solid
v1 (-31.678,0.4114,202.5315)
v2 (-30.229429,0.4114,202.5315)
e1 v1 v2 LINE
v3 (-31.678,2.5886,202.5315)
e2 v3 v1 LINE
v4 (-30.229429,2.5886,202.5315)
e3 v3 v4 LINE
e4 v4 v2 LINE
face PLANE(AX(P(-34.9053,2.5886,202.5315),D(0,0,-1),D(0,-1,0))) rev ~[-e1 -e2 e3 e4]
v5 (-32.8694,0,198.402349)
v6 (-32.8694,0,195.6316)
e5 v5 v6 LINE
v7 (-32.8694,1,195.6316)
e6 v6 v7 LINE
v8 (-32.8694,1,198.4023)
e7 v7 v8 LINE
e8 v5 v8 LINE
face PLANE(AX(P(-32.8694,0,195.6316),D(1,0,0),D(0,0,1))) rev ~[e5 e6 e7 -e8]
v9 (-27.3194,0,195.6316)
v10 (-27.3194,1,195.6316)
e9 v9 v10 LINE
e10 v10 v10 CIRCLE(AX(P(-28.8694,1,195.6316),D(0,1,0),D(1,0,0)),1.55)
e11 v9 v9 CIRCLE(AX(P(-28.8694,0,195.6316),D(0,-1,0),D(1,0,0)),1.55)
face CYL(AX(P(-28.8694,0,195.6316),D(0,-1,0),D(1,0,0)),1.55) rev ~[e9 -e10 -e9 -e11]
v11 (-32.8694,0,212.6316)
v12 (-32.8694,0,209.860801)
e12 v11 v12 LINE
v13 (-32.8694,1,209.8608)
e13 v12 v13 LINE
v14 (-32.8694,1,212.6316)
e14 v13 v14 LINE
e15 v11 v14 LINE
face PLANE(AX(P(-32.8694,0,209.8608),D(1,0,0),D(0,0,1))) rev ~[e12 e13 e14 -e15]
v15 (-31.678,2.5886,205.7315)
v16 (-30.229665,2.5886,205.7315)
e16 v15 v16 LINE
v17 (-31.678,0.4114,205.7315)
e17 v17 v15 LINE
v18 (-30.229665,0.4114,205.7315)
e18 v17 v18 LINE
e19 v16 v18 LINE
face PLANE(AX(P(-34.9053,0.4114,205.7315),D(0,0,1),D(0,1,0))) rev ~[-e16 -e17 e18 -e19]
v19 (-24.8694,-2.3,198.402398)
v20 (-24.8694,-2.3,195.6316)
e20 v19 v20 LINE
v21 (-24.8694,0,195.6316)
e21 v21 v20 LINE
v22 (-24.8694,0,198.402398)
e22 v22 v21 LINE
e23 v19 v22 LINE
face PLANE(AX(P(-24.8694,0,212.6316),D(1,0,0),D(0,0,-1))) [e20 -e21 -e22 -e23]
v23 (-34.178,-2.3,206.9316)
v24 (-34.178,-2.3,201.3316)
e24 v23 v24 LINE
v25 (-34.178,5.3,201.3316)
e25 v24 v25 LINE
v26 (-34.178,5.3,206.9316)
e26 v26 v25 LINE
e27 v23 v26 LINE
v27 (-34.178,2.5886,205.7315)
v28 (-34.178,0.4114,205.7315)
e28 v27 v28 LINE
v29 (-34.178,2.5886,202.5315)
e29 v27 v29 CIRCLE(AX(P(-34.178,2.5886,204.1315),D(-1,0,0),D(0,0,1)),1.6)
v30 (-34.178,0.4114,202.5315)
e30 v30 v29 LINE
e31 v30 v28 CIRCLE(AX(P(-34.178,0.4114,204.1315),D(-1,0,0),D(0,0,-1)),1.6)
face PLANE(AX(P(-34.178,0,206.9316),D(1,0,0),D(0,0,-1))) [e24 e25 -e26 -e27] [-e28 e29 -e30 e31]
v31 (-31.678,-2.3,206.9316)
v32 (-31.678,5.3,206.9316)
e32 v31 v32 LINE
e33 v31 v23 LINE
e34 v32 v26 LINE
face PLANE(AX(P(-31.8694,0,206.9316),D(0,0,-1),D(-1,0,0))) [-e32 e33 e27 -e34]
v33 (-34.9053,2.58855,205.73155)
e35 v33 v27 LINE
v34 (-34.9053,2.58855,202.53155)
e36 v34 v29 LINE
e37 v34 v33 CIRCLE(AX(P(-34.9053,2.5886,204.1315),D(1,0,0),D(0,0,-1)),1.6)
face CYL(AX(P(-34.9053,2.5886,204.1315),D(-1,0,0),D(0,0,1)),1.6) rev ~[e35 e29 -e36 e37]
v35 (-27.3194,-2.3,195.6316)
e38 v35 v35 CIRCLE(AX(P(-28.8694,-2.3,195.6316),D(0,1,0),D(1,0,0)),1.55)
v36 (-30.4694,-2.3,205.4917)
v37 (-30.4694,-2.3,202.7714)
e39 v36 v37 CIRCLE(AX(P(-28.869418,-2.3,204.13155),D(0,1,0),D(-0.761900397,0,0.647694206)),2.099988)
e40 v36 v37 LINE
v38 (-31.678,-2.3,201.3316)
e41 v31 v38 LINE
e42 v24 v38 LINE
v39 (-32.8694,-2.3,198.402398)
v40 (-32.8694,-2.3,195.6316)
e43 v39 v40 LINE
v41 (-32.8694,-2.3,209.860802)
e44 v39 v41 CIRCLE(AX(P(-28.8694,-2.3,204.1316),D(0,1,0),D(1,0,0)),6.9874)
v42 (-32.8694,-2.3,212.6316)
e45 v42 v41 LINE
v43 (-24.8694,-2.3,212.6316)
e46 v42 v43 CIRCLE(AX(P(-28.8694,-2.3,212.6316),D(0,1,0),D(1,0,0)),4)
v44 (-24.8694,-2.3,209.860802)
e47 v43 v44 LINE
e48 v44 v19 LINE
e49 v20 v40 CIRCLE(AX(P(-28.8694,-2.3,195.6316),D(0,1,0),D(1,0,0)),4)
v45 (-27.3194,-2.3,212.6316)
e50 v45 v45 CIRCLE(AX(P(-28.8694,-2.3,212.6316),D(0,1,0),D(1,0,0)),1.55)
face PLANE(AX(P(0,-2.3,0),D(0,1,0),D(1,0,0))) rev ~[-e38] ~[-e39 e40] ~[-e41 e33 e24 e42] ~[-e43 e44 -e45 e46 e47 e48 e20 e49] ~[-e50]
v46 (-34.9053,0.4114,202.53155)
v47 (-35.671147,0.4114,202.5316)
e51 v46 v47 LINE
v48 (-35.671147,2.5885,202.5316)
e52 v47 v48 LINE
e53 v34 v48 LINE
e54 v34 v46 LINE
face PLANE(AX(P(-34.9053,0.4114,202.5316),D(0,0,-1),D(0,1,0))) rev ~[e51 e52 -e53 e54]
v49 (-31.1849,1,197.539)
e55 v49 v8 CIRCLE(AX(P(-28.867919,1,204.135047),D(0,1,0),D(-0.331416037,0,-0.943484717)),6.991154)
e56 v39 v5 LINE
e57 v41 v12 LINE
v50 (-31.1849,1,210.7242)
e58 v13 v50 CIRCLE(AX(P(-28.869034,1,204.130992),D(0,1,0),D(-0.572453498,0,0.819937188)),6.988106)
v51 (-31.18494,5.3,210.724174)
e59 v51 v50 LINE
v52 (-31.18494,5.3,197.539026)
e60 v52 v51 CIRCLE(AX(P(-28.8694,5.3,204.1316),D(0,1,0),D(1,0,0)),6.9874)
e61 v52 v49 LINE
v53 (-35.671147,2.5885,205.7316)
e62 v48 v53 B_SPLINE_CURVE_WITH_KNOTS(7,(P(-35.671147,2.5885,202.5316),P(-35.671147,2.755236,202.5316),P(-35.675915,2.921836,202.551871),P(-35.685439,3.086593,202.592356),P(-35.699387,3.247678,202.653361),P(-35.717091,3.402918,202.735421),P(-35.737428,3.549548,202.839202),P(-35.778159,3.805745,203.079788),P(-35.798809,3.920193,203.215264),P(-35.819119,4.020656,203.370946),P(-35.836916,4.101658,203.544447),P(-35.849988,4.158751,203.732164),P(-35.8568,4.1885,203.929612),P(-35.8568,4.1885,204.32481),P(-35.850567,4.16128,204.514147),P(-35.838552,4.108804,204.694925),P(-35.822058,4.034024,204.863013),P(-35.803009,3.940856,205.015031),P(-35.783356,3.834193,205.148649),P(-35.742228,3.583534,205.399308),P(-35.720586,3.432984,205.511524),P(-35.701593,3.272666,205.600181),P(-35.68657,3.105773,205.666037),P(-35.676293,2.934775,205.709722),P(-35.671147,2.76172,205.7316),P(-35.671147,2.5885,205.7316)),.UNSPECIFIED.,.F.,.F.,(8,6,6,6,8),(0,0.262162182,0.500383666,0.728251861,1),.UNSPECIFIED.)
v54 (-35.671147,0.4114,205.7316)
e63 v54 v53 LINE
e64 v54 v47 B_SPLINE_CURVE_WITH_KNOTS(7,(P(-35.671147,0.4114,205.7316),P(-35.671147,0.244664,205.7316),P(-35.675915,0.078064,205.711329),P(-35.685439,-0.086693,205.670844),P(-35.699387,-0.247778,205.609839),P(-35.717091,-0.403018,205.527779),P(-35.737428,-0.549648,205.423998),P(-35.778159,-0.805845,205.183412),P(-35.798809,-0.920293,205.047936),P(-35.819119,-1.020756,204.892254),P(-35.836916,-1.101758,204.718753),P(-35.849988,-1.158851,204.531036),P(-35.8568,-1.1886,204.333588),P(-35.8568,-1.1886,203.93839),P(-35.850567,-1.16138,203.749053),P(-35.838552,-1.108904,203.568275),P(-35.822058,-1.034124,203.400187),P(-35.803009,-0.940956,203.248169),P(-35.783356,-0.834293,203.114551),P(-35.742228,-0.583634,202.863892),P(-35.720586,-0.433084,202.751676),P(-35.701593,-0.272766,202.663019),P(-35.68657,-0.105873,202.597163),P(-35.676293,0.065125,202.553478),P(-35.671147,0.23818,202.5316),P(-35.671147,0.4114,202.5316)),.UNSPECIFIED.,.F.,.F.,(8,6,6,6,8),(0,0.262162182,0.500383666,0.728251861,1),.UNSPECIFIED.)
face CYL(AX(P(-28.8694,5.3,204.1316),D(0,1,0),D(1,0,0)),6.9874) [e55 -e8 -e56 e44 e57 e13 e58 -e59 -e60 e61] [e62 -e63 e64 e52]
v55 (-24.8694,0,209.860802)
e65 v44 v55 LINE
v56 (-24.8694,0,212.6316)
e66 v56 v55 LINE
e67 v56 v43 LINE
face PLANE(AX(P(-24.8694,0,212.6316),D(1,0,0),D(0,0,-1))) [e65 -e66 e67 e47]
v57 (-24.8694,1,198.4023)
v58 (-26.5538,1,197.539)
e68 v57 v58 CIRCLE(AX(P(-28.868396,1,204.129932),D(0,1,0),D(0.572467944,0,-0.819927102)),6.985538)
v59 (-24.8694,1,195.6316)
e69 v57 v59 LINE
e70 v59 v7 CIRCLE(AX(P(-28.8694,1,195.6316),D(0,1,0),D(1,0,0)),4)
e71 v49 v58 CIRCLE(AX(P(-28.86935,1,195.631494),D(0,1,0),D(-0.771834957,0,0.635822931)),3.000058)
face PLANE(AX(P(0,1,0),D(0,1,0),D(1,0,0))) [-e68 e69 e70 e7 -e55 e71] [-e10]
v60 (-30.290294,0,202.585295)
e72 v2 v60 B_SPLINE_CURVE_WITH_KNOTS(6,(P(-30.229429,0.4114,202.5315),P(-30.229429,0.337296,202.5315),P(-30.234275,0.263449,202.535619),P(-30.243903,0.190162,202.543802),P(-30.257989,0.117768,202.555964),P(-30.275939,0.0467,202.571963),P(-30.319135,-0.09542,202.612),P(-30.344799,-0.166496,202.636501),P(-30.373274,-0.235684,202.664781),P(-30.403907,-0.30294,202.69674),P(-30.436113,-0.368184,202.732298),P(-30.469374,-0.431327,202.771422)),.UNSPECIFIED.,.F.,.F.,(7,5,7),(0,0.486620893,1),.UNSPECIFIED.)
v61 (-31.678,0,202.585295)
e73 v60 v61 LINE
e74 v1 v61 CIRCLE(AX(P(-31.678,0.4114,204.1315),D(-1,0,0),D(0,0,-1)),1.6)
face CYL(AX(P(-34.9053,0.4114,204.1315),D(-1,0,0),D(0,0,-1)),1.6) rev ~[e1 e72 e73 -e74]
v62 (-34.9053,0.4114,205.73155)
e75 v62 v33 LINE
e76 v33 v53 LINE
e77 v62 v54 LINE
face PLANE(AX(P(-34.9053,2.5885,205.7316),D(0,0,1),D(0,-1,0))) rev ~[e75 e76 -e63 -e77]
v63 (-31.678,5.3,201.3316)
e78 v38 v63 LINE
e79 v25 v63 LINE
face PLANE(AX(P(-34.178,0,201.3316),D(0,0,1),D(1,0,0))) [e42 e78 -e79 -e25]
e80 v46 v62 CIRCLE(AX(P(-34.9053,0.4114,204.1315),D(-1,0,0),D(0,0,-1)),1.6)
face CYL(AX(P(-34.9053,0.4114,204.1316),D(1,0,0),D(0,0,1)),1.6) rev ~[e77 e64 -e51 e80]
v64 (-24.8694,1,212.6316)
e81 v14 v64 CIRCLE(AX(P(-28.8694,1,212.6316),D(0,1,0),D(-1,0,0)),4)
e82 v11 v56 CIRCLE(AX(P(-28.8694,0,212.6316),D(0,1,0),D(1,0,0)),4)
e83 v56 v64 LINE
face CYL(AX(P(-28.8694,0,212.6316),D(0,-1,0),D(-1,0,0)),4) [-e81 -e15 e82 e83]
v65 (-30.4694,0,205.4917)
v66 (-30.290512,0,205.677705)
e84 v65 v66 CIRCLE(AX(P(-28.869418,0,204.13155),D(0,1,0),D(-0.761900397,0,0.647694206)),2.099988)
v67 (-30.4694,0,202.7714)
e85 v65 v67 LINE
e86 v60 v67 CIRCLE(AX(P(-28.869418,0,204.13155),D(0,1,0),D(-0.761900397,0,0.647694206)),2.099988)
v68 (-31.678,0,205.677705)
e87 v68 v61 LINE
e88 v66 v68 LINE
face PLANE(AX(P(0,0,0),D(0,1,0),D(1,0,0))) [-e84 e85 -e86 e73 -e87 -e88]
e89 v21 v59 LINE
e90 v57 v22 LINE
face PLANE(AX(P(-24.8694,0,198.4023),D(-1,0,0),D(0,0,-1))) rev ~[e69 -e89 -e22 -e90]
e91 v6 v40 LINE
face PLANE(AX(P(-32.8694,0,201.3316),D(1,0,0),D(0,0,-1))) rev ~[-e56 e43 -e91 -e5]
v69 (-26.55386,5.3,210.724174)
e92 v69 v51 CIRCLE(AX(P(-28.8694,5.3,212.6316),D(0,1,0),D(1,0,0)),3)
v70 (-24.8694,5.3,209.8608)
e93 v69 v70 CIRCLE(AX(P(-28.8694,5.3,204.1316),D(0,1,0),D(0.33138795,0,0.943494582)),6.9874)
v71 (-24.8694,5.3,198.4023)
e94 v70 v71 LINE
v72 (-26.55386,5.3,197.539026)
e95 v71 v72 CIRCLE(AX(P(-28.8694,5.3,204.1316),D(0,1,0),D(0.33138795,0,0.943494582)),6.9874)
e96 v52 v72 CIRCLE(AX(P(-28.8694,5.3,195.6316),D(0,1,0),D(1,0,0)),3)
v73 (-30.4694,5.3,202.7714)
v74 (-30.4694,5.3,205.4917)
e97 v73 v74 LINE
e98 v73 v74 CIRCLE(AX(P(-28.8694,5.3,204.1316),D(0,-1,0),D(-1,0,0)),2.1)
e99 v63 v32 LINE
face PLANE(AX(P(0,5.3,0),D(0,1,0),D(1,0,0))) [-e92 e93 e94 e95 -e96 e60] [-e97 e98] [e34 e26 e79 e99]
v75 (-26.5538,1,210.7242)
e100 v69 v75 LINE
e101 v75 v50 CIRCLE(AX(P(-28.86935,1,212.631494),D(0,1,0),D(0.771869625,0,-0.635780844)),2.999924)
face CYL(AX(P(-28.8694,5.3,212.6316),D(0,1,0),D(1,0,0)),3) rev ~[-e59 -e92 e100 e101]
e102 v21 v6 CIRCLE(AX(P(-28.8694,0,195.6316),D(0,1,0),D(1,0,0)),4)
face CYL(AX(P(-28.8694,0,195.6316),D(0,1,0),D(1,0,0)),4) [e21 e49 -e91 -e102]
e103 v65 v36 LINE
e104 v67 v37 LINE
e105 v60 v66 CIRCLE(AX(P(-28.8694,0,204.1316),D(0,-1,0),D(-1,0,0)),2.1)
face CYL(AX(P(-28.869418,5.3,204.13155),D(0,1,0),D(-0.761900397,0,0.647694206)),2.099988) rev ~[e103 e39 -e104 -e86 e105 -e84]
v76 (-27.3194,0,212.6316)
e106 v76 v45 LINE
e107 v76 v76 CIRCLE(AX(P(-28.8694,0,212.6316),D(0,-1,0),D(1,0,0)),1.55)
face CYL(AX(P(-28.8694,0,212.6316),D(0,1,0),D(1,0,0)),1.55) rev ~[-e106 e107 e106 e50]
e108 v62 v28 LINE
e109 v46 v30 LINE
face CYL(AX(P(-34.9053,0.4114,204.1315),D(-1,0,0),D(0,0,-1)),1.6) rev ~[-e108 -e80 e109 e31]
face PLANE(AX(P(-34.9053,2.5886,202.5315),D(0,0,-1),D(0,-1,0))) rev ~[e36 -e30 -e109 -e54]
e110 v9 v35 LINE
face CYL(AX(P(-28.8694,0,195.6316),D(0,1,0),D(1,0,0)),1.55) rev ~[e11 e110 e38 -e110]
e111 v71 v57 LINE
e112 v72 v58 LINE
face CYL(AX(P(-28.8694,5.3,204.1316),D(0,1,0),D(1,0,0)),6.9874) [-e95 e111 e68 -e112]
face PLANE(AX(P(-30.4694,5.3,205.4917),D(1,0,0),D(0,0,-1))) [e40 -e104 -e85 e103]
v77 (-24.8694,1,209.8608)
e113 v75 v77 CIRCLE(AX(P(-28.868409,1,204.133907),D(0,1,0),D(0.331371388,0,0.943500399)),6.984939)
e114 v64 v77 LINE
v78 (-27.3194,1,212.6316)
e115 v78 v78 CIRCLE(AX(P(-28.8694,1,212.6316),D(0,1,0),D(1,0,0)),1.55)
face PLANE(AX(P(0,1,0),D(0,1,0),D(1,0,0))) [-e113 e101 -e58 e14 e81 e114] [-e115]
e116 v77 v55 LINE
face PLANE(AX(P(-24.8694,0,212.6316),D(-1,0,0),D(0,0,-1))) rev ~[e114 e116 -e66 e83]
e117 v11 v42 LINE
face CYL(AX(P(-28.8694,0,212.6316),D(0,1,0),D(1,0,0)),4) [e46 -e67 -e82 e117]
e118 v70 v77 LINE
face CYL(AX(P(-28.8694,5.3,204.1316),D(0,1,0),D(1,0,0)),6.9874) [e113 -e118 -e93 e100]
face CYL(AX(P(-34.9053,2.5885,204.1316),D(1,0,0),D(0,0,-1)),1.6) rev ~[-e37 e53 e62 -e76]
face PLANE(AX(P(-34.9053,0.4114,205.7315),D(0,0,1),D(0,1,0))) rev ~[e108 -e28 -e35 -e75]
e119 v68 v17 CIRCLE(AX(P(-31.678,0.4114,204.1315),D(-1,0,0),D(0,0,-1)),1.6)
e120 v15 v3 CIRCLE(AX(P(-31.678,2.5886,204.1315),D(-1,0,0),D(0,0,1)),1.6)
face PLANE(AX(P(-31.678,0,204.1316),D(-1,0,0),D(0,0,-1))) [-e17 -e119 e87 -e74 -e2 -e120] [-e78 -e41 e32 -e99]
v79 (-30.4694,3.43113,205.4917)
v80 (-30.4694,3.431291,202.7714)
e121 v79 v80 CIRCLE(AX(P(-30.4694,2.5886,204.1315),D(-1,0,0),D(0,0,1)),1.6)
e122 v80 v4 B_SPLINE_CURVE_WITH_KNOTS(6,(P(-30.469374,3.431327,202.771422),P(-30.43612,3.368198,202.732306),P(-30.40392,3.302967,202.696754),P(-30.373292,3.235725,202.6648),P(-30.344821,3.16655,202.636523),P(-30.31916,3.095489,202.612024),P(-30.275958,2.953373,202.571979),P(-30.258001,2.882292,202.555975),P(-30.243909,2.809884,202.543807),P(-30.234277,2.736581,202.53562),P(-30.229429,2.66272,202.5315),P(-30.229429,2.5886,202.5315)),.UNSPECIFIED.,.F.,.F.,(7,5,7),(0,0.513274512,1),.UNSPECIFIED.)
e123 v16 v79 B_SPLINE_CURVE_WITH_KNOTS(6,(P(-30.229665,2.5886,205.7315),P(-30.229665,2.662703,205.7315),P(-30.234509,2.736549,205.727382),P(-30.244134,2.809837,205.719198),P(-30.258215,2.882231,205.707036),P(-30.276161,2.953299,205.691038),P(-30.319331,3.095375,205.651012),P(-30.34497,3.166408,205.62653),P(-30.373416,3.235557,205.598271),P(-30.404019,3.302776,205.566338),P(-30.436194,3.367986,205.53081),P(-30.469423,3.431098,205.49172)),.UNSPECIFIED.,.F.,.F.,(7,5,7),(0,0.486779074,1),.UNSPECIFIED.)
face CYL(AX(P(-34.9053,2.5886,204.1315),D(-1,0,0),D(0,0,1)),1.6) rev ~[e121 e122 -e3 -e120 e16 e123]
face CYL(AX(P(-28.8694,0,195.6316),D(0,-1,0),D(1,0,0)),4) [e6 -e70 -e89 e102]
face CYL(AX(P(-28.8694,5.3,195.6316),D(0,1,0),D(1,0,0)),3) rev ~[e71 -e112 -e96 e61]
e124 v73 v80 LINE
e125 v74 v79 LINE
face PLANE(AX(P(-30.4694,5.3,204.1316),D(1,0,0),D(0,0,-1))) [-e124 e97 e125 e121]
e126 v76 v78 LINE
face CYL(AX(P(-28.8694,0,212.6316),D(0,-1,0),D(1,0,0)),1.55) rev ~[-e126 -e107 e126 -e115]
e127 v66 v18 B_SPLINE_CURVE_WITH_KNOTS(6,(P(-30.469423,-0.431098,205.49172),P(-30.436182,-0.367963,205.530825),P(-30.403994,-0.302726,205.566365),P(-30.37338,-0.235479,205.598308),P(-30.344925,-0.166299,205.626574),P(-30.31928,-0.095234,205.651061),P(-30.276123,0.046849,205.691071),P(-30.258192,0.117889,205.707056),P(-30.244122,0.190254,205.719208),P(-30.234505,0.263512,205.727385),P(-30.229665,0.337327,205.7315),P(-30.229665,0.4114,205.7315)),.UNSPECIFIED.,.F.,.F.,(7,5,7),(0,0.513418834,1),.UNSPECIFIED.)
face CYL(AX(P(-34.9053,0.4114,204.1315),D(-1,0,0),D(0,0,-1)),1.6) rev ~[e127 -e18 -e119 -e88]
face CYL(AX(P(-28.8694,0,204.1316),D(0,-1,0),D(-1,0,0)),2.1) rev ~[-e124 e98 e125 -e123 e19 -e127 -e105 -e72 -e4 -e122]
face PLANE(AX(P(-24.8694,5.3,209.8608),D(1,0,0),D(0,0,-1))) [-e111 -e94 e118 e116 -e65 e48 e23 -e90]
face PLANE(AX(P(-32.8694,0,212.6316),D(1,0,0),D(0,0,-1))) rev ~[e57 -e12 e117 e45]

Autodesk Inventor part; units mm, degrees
ref_plane "YZ Plane" through (0, 0, 0) normal (1, 0, 0) x (0, 1, 0)
ref_plane "XZ Plane" through (0, 0, 0) normal (0, 1, 0) x (-1, 0, 0)
ref_plane "XY Plane" through (0, 0, 0) normal (0, 0, 1) x (1, 0, 0)
sketch "Sketch1" plane through (0, 0, 0) normal (0, 1, 0) x (-1, 0, 0)
  line L0 (31.678, 204.1316) -> (31.678, 201.3316)
  line L1 (31.678, 201.3316) -> (31.678, 206.9316)
  circle A0 centre (28.8694, 204.1316) radius 2.1
  line L2 (26.7694, 204.1316) -> (30.3694, 204.1316)
  line L3 (30.3694, 204.1316) -> (30.3694, 202.6619)
  line L4 (30.3694, 202.6619) -> (30.3694, 205.6012)
  line L5 (30.3694, 204.1316) -> (31.678, 204.1316)
  line L6 (31.678, 201.3316) -> (34.178, 201.3316)
  line L7 (34.178, 201.3316) -> (34.178, 206.9316)
  line L8 (34.178, 206.9316) -> (31.678, 206.9316)
  line L9 (31.678, 206.9316) -> (31.678, 201.3316)
  circle A1 centre (28.8694, 204.1316) radius 8.5
  circle A2 centre (28.8694, 212.6316) radius 1.55
  circle A3 centre (28.8694, 195.6316) radius 1.55
  line L10 (22.8334, 207.9209) -> (34.9053, 207.9209)
  line L11 (34.9053, 207.9209) -> (34.9053, 200.3422)
  line L12 (34.9053, 200.3422) -> (22.8334, 200.3422)
  line L13 (22.8334, 200.3422) -> (22.8334, 207.9209)
  line L14 (22.8334, 207.9209) -> (34.9053, 200.3422) construction
  line L15 (34.9053, 207.9209) -> (22.8334, 200.3422) construction
  line L16 (22.8334, 200.3422) -> (25.8027, 200.3422)
  line L17 (25.8027, 200.3422) -> (25.8027, 207.9209)
  line L18 (25.8027, 207.9209) -> (22.8334, 207.9209)
  line L19 (22.8334, 207.9209) -> (22.8334, 200.3422)
  dimension "d1" = 2.8
  dimension "d2" = 5.6
  dimension "d3" = 4.2
  dimension "d5" = 2.5
  dimension "d6" = 17
  dimension "d7" = 3.1
  dimension "d8" = 3.1
extrude "Extrusion1" add sketch "Sketch1" along normal blind 7 contours L10 L11 L12 L17
sketch "Sketch2" plane through (0, 0, 0) normal (0, -1, 0) x (1, 0, 0)
  point P0 (0, 0)
sketch "Sketch3" plane through (0, 0, 0) normal (0, -1, 0) x (1, 0, 0)
  circle A0 centre (-28.8694, 204.1316) radius 2.1 projected
  circle A1 centre (-28.8694, 204.1316) radius 8.5
  circle A2 centre (-28.8694, 212.6316) radius 1.55
  circle A3 centre (-28.8694, 195.6316) radius 1.55
  circle A4 centre (-28.8694, 212.6316) radius 3
  circle A5 centre (-28.8694, 195.6316) radius 3
  line L0 (-31.8694, 212.6316) -> (-31.8694, 195.6316)
  line L1 (-25.8694, 195.6316) -> (-25.8694, 212.6316)
  point P0 (0, 0)
  point P1 (-25.9164, 212.1021)
  point P2 (-31.8223, 212.1021)
  point P3 (-31.8694, 212.0845)
  point P4 (-31.8694, 196.1786)
  point P5 (-31.8223, 196.161)
  point P6 (-25.9164, 196.161)
  point P7 (-25.8694, 196.1786)
  point P8 (-25.8694, 212.0845)
  dimension "d11" = 17
  dimension "d12" = 3.1
  dimension "d13" = 3.1
  dimension "d14" = 6
  dimension "d15" = 6
extrude "Extrusion4" add sketch "Sketch3" along normal blind 2.3 contours L1 A1 A5 L0 A4 | A1 A4 L1 | L1 A5 A1 | A4 A1 A2 | A1 A2 A4 | A5 A1 A3 | A1 A3 A5 | A1 L0 A4 | A5 L0 A1
sketch "Sketch5" plane through (0, 0, 0) normal (0, -1, 0) x (1, 0, 0)
  line L0 (-34.9053, 207.9209) -> (-25.8027, 207.9209) projected
  line L1 (-31.8694, 200.3422) -> (-31.8694, 201.3316) projected
  line L2 (-34.9053, 207.9209) -> (-31.8694, 207.9209)
  line L3 (-31.8694, 207.9209) -> (-31.8694, 200.3422)
  line L4 (-31.8694, 200.3422) -> (-34.9053, 200.3422)
  line L5 (-34.9053, 200.3422) -> (-34.9053, 207.9209)
  line L6 (-34.178, 201.3316) -> (-31.678, 201.3316) projected
  line L7 (-31.678, 206.9316) -> (-34.178, 206.9316) projected
  line L8 (-34.178, 201.3316) -> (-31.8694, 201.3316)
  line L9 (-31.8694, 201.3316) -> (-31.8694, 206.9316)
  line L10 (-31.8694, 206.9316) -> (-34.178, 206.9316)
  line L11 (-34.178, 206.9316) -> (-34.178, 201.3316)
  point P0 (0, 0)
extrude "Extrusion5" add sketch "Sketch5" along normal blind 2.3 contours L0 L3 L7 L11 L6 L1 L4 L5
sketch "Sketch6" plane through (-25.8694, 0, 200.3422) normal (1, 0, 0) x (0, 0, -1)
  line L0 (-9.2808, 8.2816) -> (1.9224, 8.2816)
  line L1 (1.9224, 8.2816) -> (1.9224, -4.0318)
  line L2 (1.9224, -4.0318) -> (-9.2808, -4.0318)
  line L3 (-9.2808, -4.0318) -> (-9.2808, 8.2816)
  point P0 (200.3422, 0)
extrude "Extrusion6" cut sketch "Sketch6" along normal blind 2.3
sketch "Sketch7" plane through (-25.8694, 0, 212.6316) normal (1, 0, 0) x (0, 0, -1)
  point P0 (212.6316, 0)
sketch "Sketch8" plane through (0, 7, 0) normal (0, 1, 0) x (1, 0, 0)
  line L0 (-31.678, -201.3316) -> (-31.678, -206.9316) projected
  line L1 (-31.678, -206.9316) -> (-34.178, -206.9316) projected
  line L2 (-34.178, -206.9316) -> (-34.178, -201.3316) projected
  line L3 (-34.178, -201.3316) -> (-31.678, -201.3316) projected
  circle A0 centre (-28.8694, -204.1316) radius 2.1 projected
  line L4 (-25.8694, -207.9209) -> (-25.8694, -200.3422) projected
  line L5 (-25.8694, -200.3422) -> (-34.9053, -200.3422) projected
  line L6 (-34.9053, -200.3422) -> (-34.9053, -207.9209) projected
  line L7 (-34.9053, -207.9209) -> (-25.8694, -207.9209) projected
  point P0 (0, 0)
extrude "Extrusion7" cut sketch "Sketch8" against normal blind 1.7
sketch "Sketch9" plane through (0, 5.3, 0) normal (0, 1, 0) x (1, 0, 0)
  line L0 (-31.678, -201.3316) -> (-31.678, -206.9316) projected
  line L1 (-34.178, -206.9316) -> (-31.8694, -206.9316) projected
  line L2 (-31.678, -201.3316) -> (-34.178, -201.3316)
  line L3 (-34.178, -201.3316) -> (-34.178, -206.9316)
  line L4 (-34.178, -206.9316) -> (-31.678, -206.9316)
  line L5 (-31.678, -206.9316) -> (-31.678, -201.3316)
  point P0 (0, 0)
extrude "Extrusion8" cut sketch "Sketch9" against normal through all
sketch "Sketch10" plane through (-34.9053, -2.3, 200.3422) normal (-1, 0, 0) x (0, 0, 1)
  line L0 (6.5893, 7.6) -> (0.9893, 7.6) projected
  line L1 (3.7893, 7.6) -> (3.7893, 0)
  line L2 (5.8893, 0) -> (1.6893, 0) projected
  line L3 (3.7893, 2.0731) -> (3.7893, 5.5269) construction
  line L4 (3.7893, 3.8) -> (3.7893, 2.7114)
  line L5 (3.7893, 4.8886) -> (3.7893, 2.7114) construction
  line L6 (2.1893, 4.8886) -> (2.1893, 2.7114)
  line L7 (5.3893, 2.7114) -> (5.3893, 4.8886)
  arc A0 (5.3893, 4.8886) -> (2.1893, 4.8886) centre (3.7893, 4.8886) ccw
  arc A1 (2.1893, 2.7114) -> (5.3893, 2.7114) centre (3.7893, 2.7114) ccw
  point P0 (-200.3422, 2.3)
  dimension "d39" = 3.2
fillet "Fillet1" radius 0.7 2 edges at (-34.9053, 1.5, 207.9209) (-34.9053, 1.5, 200.3422)
fillet "Fillet2" radius 1 2 edges at (-25.8694, 2.65, 207.9209) (-25.8694, 2.65, 200.3422)
sketch "Sketch11" plane through (0, 5.3, 0) normal (0, 1, 0) x (1, 0, 0)
  circle A0 centre (-28.8694, -204.1316) radius 2.1 projected
  circle A1 centre (-28.8694, -204.1316) radius 2.1
  line L0 (-26.7694, -204.1316) -> (-30.4694, -204.1316)
  line L1 (-30.4694, -204.1316) -> (-30.4694, -202.7714)
  line L2 (-30.4694, -202.7714) -> (-30.4694, -205.4917)
  point P0 (0, 0)
  dimension "d36" = 3.7
extrude "Extrusion10" add sketch "Sketch11" against normal up to surface (7.6 mm away) contours L1 L2 A0
extrude "Extrusion11" cut sketch "Sketch10" against normal blind 6
sketch "Sketch12" plane through (0, 5.3, 0) normal (0, 1, 0) x (1, 0, 0)
  circle A0 centre (-28.8694, -212.6316) radius 1.55 projected
  circle A1 centre (-28.8694, -212.6316) radius 3
  circle A2 centre (-28.8694, -195.6316) radius 1.55 projected
  circle A3 centre (-28.8694, -195.6316) radius 3
  arc A4 (-30.4694, -205.4917) -> (-30.4694, -202.7714) centre (-28.8694, -204.1316) ccw projected
  circle A5 centre (-28.8694, -204.1316) radius 6.9874
  arc A6 (-25.8694, -201.3422) -> (-26.8694, -200.3422) centre (-26.8694, -201.3422) ccw projected
  line L0 (-34.2053, -200.3422) -> (-26.8694, -200.3422) projected
  arc A7 (-34.2053, -200.3422) -> (-34.9053, -201.0422) centre (-34.2053, -201.0422) ccw projected
  line L1 (-34.9053, -207.2209) -> (-34.9053, -201.0422) projected
  arc A8 (-34.9053, -207.2209) -> (-34.2053, -207.9209) centre (-34.2053, -207.2209) ccw projected
  line L2 (-26.8694, -207.9209) -> (-34.2053, -207.9209) projected
  arc A9 (-26.8694, -207.9209) -> (-25.8694, -206.9209) centre (-26.8694, -206.9209) ccw projected
  line L3 (-25.8694, -201.3422) -> (-25.8694, -206.9209) projected
  line L4 (-31.678, -206.9316) -> (-31.678, -201.3316) projected
  line L5 (-34.178, -206.9316) -> (-31.678, -206.9316) projected
  line L6 (-34.178, -201.3316) -> (-34.178, -206.9316) projected
  line L7 (-31.678, -201.3316) -> (-34.178, -201.3316) projected
  arc A10 (-30.4694, -205.4917) -> (-30.4694, -202.7714) centre (-28.8694, -204.1316) ccw projected
  line L8 (-30.4694, -205.4917) -> (-30.4694, -202.7714) projected
  point P0 (0, 0)
  point P1 (-31.1849, -197.539)
  point P2 (-31.1849, -210.7242)
  point P3 (-26.5538, -210.7242)
  point P4 (-26.5538, -197.539)
  dimension "d42" = 6
  dimension "d43" = 6
extrude "Extrusion12" add sketch "Sketch12" against normal up to surface (7.6 mm away) contours A1 A5 A3
sketch "Sketch13" plane through (0, 0, 0) normal (0, 1, 0) x (1, 0, 0)
  circle A0 centre (-28.8694, -212.6316) radius 1.55 projected
  circle A1 centre (-28.8694, -212.6316) radius 4
  circle A2 centre (-28.8694, -195.6316) radius 1.55 projected
  circle A3 centre (-28.8694, -195.6316) radius 4
  line L0 (-32.8694, -212.6316) -> (-32.8694, -195.6316)
  line L1 (-24.8694, -212.6316) -> (-24.8694, -195.6316)
  line L2 (-31.678, -201.3316) -> (-34.178, -201.3316) projected
  line L3 (-34.178, -206.9316) -> (-31.678, -206.9316) projected
  line L4 (-31.678, -201.3316) -> (-32.928, -201.3316)
  line L5 (-32.928, -201.3316) -> (-32.928, -206.9316)
  line L6 (-32.928, -206.9316) -> (-31.678, -206.9316)
  line L7 (-31.678, -206.9316) -> (-31.678, -201.3316)
  point P0 (0, 0)
  point P1 (-32.8694, -201.3316)
  point P2 (-32.8694, -206.9316)
  dimension "d46" = 8
  dimension "d47" = 8
extrude "Extrusion13" add sketch "Sketch13" against normal up to surface (2.3 mm away) contours A1 | A1 L0 L3 L7 L2 A3 L1 | A3
sketch "Sketch14" plane through (0, 5.3, 0) normal (0, 1, 0) x (1, 0, 0)
  line L0 (-24.8694, -212.6316) -> (-24.8694, -209.8608) projected
  line L1 (-24.8694, -198.4023) -> (-24.8694, -195.6316) projected
  line L2 (-24.8694, -209.8608) -> (-24.8694, -198.4023)
  line L3 (-24.8694, -198.4023) -> (-21.4183, -198.4023)
  line L4 (-21.4183, -198.4023) -> (-21.2342, -210.9453)
  line L5 (-21.2342, -210.9453) -> (-24.8694, -209.8608)
  point P0 (0, 0)
extrude "Extrusion14" cut sketch "Sketch14" against normal through all
sketch "Sketch16" plane through (-34.9053, 0.4114, 202.5316) normal (1, 0, 0) x (0, 0, -1)
  line L0 (0, 0) -> (0, 2.1771) projected
  arc A0 (0, 2.1771) -> (-3.2, 2.1771) centre (-1.6, 2.1771) ccw projected
  line L1 (-3.2, 2.1771) -> (-3.2, 0) projected
  arc A1 (-3.2, 0) -> (0, 0) centre (-1.6, 0) ccw projected
  point P0 (202.5316, -0.4114)
extrude "Extrusion16" cut sketch "Sketch16" against normal blind 10
sketch "Sketch17" plane through (0, 0, 0) normal (0, 1, 0) x (1, 0, 0)
  arc A0 (-32.8694, -209.8608) -> (-31.1849, -210.7242) centre (-28.8694, -204.1316) ccw projected
  line L0 (-32.8694, -209.8608) -> (-32.8694, -212.6316) projected
  arc A1 (-32.8694, -212.6316) -> (-24.8694, -212.6316) centre (-28.8694, -212.6316) ccw projected
  line L1 (-24.8694, -212.6316) -> (-24.8694, -209.8608) projected
  arc A2 (-26.5538, -210.7242) -> (-24.8694, -209.8608) centre (-28.8694, -204.1316) ccw projected
  arc A3 (-26.5538, -210.7242) -> (-31.1849, -210.7242) centre (-28.8694, -212.6316) ccw projected
  circle A4 centre (-28.8694, -212.6316) radius 1.55 projected
  arc A5 (-31.1849, -197.539) -> (-32.8694, -198.4023) centre (-28.8694, -204.1316) ccw projected
  arc A6 (-31.1849, -197.539) -> (-26.5538, -197.539) centre (-28.8694, -195.6316) ccw projected
  arc A7 (-24.8694, -198.4023) -> (-26.5538, -197.539) centre (-28.8694, -204.1316) ccw projected
  line L2 (-24.8694, -198.4023) -> (-24.8694, -195.6316) projected
  arc A8 (-24.8694, -195.6316) -> (-32.8694, -195.6316) centre (-28.8694, -195.6316) ccw projected
  line L3 (-32.8694, -195.6316) -> (-32.8694, -198.4023) projected
  circle A9 centre (-28.8694, -195.6316) radius 1.55 projected
  point P0 (0, 0)
extrude "Extrusion17" add sketch "Sketch17" along normal blind 1
sketch "Sketch18" plane through (0, 0, 0) normal (0, 1, 0) x (1, 0, 0)
  line L0 (-30.2904, -205.6777) -> (-31.678, -205.6777) projected
  arc A0 (-30.2904, -205.6777) -> (-30.2904, -202.5854) centre (-28.8694, -204.1316) ccw projected
  line L1 (-31.678, -202.5854) -> (-30.2904, -202.5854) projected
  line L2 (-31.678, -202.5854) -> (-31.678, -205.6777) projected
  point P0 (0, 0)
sketch "Sketch19" plane through (0, 5.3, 0) normal (0, 1, 0) x (1, 0, 0)
  line L0 (-30.4694, -205.4917) -> (-30.4694, -202.7714) projected
  arc A0 (-30.4694, -205.4917) -> (-30.4694, -202.7714) centre (-28.8694, -204.1316) ccw projected
  point P0 (0, 0)
extrude "Extrusion18" cut sketch "Sketch19" against normal through all
sketch "Sketch20" plane through (0, 5.3, 0) normal (0, 1, 0) x (1, 0, 0)
  point P0 (0, 0)
properties part number "Acople3"
